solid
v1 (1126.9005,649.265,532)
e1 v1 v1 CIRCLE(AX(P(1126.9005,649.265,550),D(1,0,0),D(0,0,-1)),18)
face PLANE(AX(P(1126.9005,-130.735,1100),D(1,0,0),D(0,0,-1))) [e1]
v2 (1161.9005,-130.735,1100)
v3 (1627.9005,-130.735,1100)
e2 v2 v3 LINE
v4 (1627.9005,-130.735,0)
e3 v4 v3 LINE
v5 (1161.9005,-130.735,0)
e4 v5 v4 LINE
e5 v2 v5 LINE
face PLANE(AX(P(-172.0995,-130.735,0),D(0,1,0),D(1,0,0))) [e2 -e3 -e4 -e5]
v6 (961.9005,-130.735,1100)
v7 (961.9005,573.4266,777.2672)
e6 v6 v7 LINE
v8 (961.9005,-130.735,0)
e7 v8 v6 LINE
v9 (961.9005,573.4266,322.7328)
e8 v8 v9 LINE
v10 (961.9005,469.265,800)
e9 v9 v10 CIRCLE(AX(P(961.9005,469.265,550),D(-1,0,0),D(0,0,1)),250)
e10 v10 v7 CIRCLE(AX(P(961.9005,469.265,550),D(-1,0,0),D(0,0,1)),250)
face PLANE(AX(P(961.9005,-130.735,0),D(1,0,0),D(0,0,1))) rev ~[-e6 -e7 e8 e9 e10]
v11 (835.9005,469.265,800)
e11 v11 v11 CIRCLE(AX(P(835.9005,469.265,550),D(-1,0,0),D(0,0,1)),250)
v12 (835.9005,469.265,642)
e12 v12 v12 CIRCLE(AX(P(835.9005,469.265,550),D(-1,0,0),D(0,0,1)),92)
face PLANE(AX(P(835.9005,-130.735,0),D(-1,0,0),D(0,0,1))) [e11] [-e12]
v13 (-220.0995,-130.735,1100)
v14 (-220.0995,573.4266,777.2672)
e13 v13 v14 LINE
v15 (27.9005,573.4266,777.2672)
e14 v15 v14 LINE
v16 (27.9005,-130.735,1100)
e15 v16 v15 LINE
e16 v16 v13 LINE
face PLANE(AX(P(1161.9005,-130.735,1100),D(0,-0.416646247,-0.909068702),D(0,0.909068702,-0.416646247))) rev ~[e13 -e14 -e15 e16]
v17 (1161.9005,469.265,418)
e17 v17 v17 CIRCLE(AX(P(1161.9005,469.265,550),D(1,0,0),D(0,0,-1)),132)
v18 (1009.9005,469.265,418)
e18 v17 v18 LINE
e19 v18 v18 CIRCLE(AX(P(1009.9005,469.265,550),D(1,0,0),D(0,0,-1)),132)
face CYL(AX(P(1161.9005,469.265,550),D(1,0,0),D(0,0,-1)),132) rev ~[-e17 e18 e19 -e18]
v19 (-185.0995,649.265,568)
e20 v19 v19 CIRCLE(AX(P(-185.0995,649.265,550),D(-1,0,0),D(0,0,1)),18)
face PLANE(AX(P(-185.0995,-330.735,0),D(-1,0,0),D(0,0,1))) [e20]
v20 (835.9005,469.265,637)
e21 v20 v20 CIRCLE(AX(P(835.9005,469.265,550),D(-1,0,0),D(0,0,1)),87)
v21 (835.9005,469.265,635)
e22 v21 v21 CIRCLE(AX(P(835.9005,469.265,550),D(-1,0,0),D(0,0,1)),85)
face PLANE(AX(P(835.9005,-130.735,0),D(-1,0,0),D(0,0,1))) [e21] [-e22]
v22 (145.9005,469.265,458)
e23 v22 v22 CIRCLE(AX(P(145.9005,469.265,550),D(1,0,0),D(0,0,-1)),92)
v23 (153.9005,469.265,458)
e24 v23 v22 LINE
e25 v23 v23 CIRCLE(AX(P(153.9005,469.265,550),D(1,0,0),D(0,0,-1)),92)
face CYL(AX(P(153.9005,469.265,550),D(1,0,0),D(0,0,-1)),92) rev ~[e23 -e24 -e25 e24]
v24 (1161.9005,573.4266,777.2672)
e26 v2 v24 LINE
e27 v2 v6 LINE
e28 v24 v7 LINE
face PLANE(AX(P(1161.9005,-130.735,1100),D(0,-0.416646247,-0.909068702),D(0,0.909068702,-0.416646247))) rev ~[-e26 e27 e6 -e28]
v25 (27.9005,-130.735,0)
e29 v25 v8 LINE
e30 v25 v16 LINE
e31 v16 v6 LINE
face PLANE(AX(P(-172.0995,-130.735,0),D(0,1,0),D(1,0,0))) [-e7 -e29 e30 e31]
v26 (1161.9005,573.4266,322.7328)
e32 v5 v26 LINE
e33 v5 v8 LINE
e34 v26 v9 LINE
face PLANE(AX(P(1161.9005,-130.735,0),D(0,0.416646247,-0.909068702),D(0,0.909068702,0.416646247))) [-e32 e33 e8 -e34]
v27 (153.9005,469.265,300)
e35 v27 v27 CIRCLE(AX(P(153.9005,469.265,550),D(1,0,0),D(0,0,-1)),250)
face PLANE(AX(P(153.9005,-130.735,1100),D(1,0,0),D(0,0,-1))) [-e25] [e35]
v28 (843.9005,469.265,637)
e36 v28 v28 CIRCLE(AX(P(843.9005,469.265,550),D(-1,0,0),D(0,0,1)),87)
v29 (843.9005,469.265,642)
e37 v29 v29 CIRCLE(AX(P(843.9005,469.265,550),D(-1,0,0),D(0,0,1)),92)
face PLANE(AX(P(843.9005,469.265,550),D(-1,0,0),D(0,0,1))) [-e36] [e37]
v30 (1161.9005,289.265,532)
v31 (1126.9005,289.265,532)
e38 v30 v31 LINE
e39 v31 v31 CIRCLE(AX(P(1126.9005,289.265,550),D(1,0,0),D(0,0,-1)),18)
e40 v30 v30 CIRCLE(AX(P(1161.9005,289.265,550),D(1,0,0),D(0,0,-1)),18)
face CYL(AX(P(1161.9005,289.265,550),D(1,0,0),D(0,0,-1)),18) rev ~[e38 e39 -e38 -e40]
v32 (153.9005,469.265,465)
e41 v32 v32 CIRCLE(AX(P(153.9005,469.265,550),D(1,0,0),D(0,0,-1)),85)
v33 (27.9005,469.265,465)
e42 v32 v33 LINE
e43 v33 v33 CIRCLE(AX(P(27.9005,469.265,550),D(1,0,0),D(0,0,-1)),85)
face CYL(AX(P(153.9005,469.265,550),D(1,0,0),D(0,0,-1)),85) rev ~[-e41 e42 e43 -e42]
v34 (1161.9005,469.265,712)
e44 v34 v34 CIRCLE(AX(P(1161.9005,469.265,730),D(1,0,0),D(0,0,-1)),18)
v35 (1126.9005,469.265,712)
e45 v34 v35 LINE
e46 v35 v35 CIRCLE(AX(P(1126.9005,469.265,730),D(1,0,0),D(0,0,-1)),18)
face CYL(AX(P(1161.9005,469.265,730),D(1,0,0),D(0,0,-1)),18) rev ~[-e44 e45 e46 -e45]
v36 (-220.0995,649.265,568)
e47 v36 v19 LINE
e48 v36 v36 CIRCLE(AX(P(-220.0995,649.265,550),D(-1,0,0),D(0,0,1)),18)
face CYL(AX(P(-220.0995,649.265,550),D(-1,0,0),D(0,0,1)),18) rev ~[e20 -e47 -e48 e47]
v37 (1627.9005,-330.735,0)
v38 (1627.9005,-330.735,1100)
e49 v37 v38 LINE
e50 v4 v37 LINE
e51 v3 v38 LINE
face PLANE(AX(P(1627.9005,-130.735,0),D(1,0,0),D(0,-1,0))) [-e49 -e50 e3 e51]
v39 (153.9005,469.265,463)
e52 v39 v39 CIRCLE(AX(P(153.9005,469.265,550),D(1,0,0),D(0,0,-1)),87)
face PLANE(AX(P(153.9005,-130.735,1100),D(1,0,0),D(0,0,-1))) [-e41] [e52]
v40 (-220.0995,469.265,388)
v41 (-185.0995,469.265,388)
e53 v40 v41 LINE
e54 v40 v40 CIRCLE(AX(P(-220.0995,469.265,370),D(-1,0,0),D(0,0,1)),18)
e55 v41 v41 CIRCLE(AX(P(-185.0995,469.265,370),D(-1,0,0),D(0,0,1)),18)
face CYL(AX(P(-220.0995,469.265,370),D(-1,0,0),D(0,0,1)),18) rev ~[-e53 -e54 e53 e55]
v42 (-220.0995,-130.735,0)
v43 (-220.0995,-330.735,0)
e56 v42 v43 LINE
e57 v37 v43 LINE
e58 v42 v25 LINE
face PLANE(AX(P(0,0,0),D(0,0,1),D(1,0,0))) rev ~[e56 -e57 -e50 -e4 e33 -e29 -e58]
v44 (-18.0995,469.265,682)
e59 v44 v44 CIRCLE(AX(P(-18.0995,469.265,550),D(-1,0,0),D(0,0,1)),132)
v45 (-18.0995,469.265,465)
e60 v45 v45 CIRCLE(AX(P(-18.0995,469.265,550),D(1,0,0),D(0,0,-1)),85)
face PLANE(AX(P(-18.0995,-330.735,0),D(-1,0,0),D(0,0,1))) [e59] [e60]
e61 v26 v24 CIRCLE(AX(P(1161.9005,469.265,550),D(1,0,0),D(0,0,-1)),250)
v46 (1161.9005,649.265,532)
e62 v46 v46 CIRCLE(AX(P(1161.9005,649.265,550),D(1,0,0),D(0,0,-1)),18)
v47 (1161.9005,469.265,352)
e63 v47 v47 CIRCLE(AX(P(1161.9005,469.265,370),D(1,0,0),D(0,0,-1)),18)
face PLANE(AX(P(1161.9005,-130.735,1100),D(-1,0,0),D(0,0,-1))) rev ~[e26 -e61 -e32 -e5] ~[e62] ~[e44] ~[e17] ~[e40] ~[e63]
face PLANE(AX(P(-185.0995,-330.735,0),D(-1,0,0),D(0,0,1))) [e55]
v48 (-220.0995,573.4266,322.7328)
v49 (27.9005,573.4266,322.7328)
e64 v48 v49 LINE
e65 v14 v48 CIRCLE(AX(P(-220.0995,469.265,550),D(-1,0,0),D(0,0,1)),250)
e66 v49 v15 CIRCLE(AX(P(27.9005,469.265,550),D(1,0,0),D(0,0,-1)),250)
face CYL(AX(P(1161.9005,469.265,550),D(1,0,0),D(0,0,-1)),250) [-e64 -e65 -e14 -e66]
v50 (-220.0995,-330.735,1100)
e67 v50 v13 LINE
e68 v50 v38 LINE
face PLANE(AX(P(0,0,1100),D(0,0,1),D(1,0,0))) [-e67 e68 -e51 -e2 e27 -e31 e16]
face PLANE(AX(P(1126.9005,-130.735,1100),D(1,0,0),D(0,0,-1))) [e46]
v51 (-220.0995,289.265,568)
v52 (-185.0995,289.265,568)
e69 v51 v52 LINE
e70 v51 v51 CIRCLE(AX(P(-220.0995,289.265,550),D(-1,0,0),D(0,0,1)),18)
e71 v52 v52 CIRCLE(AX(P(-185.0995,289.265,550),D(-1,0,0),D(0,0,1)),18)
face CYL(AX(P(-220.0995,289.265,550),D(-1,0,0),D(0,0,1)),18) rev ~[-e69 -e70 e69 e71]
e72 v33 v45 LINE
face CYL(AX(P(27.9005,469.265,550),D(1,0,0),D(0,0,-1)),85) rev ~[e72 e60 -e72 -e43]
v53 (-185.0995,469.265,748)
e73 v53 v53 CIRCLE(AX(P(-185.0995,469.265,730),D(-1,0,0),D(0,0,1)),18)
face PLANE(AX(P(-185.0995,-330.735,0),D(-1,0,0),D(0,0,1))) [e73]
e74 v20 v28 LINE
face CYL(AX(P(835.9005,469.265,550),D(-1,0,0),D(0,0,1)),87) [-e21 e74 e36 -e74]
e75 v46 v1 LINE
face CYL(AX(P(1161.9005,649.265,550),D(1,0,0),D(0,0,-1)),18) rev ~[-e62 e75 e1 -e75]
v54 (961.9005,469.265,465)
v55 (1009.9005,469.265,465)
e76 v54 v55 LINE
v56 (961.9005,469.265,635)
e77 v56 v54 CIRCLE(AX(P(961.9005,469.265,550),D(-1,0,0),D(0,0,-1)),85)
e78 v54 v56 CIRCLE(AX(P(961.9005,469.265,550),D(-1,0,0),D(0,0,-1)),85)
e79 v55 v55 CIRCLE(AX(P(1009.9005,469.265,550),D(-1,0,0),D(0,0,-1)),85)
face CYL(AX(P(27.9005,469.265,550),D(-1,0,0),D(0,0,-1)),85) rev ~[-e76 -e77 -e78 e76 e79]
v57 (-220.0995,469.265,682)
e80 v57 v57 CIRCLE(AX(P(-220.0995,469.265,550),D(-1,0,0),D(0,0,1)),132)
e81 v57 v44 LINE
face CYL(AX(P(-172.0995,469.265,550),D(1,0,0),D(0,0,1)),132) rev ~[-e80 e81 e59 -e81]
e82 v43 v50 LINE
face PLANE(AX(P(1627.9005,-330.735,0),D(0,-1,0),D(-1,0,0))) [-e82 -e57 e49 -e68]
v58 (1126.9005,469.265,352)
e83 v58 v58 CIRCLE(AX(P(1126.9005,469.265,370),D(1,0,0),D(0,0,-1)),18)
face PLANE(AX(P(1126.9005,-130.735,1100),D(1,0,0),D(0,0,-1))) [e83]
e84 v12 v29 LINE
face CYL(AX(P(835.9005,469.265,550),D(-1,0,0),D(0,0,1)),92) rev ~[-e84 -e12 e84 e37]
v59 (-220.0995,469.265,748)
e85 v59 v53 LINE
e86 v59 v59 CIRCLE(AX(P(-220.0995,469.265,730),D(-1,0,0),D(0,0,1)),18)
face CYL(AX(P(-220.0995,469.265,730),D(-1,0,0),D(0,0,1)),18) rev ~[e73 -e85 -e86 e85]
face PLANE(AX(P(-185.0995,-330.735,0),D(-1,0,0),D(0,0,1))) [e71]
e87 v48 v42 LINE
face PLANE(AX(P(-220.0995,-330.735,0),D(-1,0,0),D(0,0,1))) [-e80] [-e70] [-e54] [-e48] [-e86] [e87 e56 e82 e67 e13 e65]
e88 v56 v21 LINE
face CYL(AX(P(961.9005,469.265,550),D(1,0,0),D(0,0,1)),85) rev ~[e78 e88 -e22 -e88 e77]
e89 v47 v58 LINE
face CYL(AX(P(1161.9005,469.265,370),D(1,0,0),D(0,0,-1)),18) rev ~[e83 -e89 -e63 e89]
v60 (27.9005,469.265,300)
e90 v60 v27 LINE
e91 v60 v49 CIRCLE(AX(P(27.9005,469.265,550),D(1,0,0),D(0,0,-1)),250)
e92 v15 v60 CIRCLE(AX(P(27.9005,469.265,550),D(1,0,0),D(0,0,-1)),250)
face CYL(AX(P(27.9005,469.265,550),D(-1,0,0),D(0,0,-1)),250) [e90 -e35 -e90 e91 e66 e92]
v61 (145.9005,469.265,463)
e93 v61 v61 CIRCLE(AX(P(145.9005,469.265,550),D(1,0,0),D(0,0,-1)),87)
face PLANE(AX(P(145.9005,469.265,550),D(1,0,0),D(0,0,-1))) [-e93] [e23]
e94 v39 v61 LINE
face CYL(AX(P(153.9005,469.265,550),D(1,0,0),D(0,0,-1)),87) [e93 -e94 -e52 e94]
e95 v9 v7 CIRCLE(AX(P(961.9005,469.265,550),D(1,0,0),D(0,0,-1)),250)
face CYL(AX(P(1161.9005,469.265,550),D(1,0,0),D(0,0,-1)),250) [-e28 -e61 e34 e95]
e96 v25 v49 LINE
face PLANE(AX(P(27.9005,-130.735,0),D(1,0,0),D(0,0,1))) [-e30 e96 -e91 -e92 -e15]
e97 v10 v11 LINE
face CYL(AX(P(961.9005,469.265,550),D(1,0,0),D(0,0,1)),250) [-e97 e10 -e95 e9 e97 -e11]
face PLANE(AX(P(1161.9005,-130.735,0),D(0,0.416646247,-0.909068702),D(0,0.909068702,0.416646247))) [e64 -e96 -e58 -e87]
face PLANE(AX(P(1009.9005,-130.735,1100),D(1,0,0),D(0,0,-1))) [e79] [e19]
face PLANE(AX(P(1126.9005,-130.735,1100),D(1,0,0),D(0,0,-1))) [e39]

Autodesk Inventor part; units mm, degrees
ref_plane "YZ Plane" through (0, 0, 0) normal (1, 0, 0) x (0, 1, 0)
ref_plane "XZ Plane" through (0, 0, 0) normal (0, 1, 0) x (-1, 0, 0)
ref_plane "XY Plane" through (0, 0, 0) normal (0, 0, 1) x (1, 0, 0)
sketch "Szkic1" plane through (0, 0, 0) normal (0, 0, 1) x (1, 0, 0)
  line L0 (-172.0995, -130.735) -> (1627.9005, -130.735)
  line L1 (1627.9005, -130.735) -> (1627.9005, -330.735)
  line L2 (1627.9005, -330.735) -> (-172.0995, -330.735)
  line L3 (-172.0995, -330.735) -> (-172.0995, -130.735)
  dimension "d6" = 1800
  dimension "d7" = 200
extrude "Wyciągnięcie proste1" add sketch "Szkic1" along normal blind 1100
sketch "Szkic2" plane through (-172.0995, -130.735, 0) normal (0, 1, 0) x (1, 0, 0)
  point P0 (172.0995, 0)
sketch "Szkic3" plane through (-172.0995, -130.735, 0) normal (0, 1, 0) x (1, 0, 0)
  line L0 (0, 0) -> (1800, 0) projected
  line L1 (0, -1100) -> (1800, -1100) projected
  line L2 (0, 0) -> (200, 0)
  line L3 (200, 0) -> (200, -1100)
  line L4 (200, -1100) -> (0, -1100)
  line L5 (0, -1100) -> (0, 0)
  line L6 (1800, 0) -> (1700, 0)
  line L7 (1700, -1100) -> (1800, -1100)
  line L8 (1334, 0) -> (1134, 0)
  line L9 (1134, 0) -> (1134, -1100)
  line L10 (1134, -1100) -> (1334, -1100)
  line L11 (1334, -1100) -> (1334, 0)
  line L12 (100, 0) -> (100, -1100)
  line L13 (1234, 0) -> (1234, -1100) construction
  point P0 (172.0995, 0)
  point P1 (1134, 0)
  dimension "d10" = 200
  dimension "d15" = 200
  dimension "d21" = 934
extrude "Wyciągnięcie proste2" add sketch "Szkic3" along normal blind 1200 contours L0 L12 L1 L5 | L0 L3 L1 L12 | L0 L11 L1 L9
sketch "Szkic6" plane through (27.9005, -130.735, 1100) normal (1, 0, 0) x (0, 0, -1)
  line L0 (0, 1200) -> (1100, 1200) projected
  line L1 (550, 1200) -> (550, 0)
  line L2 (1100, 0) -> (0, 0) projected
  line L3 (0, 0) -> (0, 1200) projected
  line L4 (0, 600) -> (1100, 600)
  line L5 (1100, 0) -> (1100, 1200) projected
  circle A0 centre (550, 600) radius 85
  point P0 (1100, 130.735)
  dimension "d23" = 170
extrude "Wyciągnięcie proste4" cut sketch "Szkic6" along normal blind 982 and the other way blind 46 contours A0 L4 L1 | L1 L4 A0 | L4 L1 A0 | L4 A0 L1
sketch "Szkic7" plane through (1161.9005, -130.735, 1100) normal (1, 0, 0) x (0, 0, -1)
  point P0 (1100, 130.735)
sketch "Szkic8" plane through (1161.9005, -130.735, 1100) normal (1, 0, 0) x (0, 0, -1)
  circle A0 centre (550, 600) radius 85 projected
  circle A1 centre (550, 600) radius 132
  point P0 (1100, 130.735)
  dimension "d28" = 264
extrude "Wyciągnięcie proste5" cut sketch "Szkic8" against normal up to surface (152 mm away) contours A0 | A1
sketch "Szkic9" plane through (-172.0995, -330.735, 0) normal (-1, 0, 0) x (0, 0, 1)
  circle A0 centre (550, 800) radius 85 projected
  circle A1 centre (550, 800) radius 132
  point P0 (0, 330.735)
extrude "Wyciągnięcie proste6" cut sketch "Szkic9" against normal up to surface (154 mm away) contours A0 | A1
sketch "Szkic10" plane through (1161.9005, -130.735, 1100) normal (1, 0, 0) x (0, 0, -1)
  line L0 (1100, 1200) -> (0, 1200) projected
  line L1 (1100, 0) -> (0, 0) projected
  line L2 (0, -200) -> (0, 1200) projected
  circle A0 centre (550, 600) radius 250
  line L3 (0, 0) -> (322.7328, 704.1616)
  line L4 (1100, 0) -> (777.2672, 704.1616)
  line L5 (0, 0) -> (0, 1200)
  line L6 (0, 1200) -> (1100, 1200)
  line L7 (1100, -200) -> (1100, 1200) projected
  line L8 (1100, 1200) -> (1100, 0)
  point P0 (1100, 130.735)
  dimension "d33" = 500
extrude "Wyciągnięcie proste7" cut sketch "Szkic10" against normal through all contours L7 L4 A0 L3 L2 L0
sketch "Szkic11" plane through (-172.0995, -330.735, 0) normal (-1, 0, 0) x (0, 0, 1)
  circle A0 centre (550, 800) radius 132
  circle A1 centre (550, 800) radius 85 projected
  circle A2 centre (550, 800) radius 250
  line L0 (0, 200) -> (1100, 200) projected
  line L1 (0, 0) -> (1100, 0)
  line L2 (1100, 0) -> (1100, 200)
  line L3 (1100, 200) -> (0, 200)
  line L4 (0, 200) -> (0, 0)
  line L5 (1100, 200) -> (777.2672, 904.1616) projected
  line L6 (1100, 200) -> (777.2672, 904.1616)
  line L7 (322.7328, 904.1616) -> (0, 200) projected
  line L8 (0, 200) -> (322.7328, 904.1616)
  point P0 (0, 330.735)
extrude "Wyciągnięcie proste8" add sketch "Szkic11" along normal blind 48 contours A2 | A2 L5 L0 L7 | L2 L1 L4 L0
sketch "Szkic12" plane through (-220.0995, -330.735, 0) normal (-1, 0, 0) x (0, 0, 1)
  point P0 (0, 330.735)
sketch "Szkic13" plane through (-18.0995, 469.265, 550) normal (-1, 0, 0) x (0, 0, 1)
  point P0 (-550, -469.265)
ref_plane "Płaszczyzna konstrukcyjna1" through (-220.0995, -330.735, 0) normal (-1, 0, 0) x (0, 0, 1)
sketch "Szkic14" plane through (-220.0995, -330.735, 0) normal (-1, 0, 0) x (0, 0, 1)
  point P0 (0, 330.735)
sketch "Szkic15" plane through (-220.0995, -330.735, 0) normal (-1, 0, 0) x (0, 0, 1)
  point P0 (0, 330.735)
sketch "Szkic16" plane through (-220.0995, -330.735, 0) normal (-1, 0, 0) x (0, 0, 1)
  circle A0 centre (550, 980) radius 18
  point P0 (0, 330.735)
  dimension "d39" = 36
extrude "Wyciągnięcie proste9" cut sketch "Szkic16" against normal blind 35
sketch "Szkic18" plane through (-220.0995, -330.735, 0) normal (-1, 0, 0) x (0, 0, 1)
  circle A0 centre (550, 620) radius 18
  circle A1 centre (370, 800) radius 18
  point P0 (0, 330.735)
  dimension "d43" = 36
  dimension "d44" = 36
extrude "Wyciągnięcie proste10" cut sketch "Szkic18" against normal blind 35
thread "Gwint1" size "M36x4" class "6H" standard "ANSI Metric M Profile" full length
thread "Gwint2" size "M36x4" class "6H" standard "ANSI Metric M Profile" full length
thread "Gwint3" size "M36x4" class "6H" standard "ANSI Metric M Profile" full length
sketch "Szkic19" plane through (-220.0995, -330.735, 0) normal (-1, 0, 0) x (0, 0, 1)
  circle A0 centre (730, 800) radius 18
  point P0 (0, 330.735)
  dimension "d57" = 36
extrude "Wyciągnięcie proste12" cut sketch "Szkic19" against normal blind 35
thread "Gwint5" size "M36x4" class "6H" standard "ANSI Metric M Profile" full length
sketch "Szkic20" plane through (27.9005, -130.735, 1100) normal (1, 0, 0) x (0, 0, -1)
  point P0 (1100, 130.735)
sketch "Szkic26" plane through (961.9005, -130.735, 0) normal (-1, 0, 0) x (0, 0, 1)
  circle A0 centre (550, 600) radius 85 projected
  circle A1 centre (550, 600) radius 250
  point P0 (0, 130.735)
extrude "Wyciągnięcie proste15" add sketch "Szkic26" along normal blind 126
sketch "Szkic27" plane through (835.9005, 469.265, 550) normal (-1, 0, 0) x (0, 0, 1)
  circle A0 centre (0, 0) radius 87
  circle A1 centre (0, 0) radius 92
  point P0 (-550, -469.265)
  dimension "d71" = 174
  dimension "d72" = 184
extrude "Wyciągnięcie proste16" cut sketch "Szkic27" against normal blind 8
sketch "Szkic28" plane through (-220.0995, -330.735, 0) normal (-1, 0, 0) x (0, 0, 1)
  point P0 (0, 330.735)
sketch "Szkic29" plane through (1161.9005, -130.735, 1100) normal (1, 0, 0) x (0, 0, -1)
  circle A0 centre (550, 780) radius 18 projected
  circle A1 centre (550, 780) radius 18
  circle A2 centre (730, 600) radius 18 projected
  circle A3 centre (730, 600) radius 18
  circle A4 centre (550, 420) radius 18 projected
  circle A5 centre (550, 420) radius 18
  circle A6 centre (370, 600) radius 18 projected
  circle A7 centre (370, 600) radius 18
  point P0 (1100, 130.735)
  dimension "d75" = 36
  dimension "d76" = 36
  dimension "d77" = 36
  dimension "d78" = 36
extrude "Wyciągnięcie proste17" cut sketch "Szkic29" against normal blind 35
thread "Gwint6" size "M36x4" class "6H" standard "ANSI Metric M Profile" full length
thread "Gwint7" size "M36x4" class "6H" standard "ANSI Metric M Profile" full length
thread "Gwint8" size "M36x4" class "6H" standard "ANSI Metric M Profile" full length
thread "Gwint9" size "M36x4" class "6H" standard "ANSI Metric M Profile" full length
sketch "Szkic30" plane through (27.9005, -130.735, 1100) normal (1, 0, 0) x (0, 0, -1)
  circle A0 centre (550, 600) radius 250
  point P0 (1100, 130.735)
  dimension "d89" = 500
extrude "Wyciągnięcie proste18" add sketch "Szkic30" along normal blind 126
sketch "Szkic31" plane through (153.9005, 469.265, 550) normal (1, 0, 0) x (0, 0, -1)
  point P0 (550, -469.265)
sketch "Szkic32" plane through (153.9005, 469.265, 550) normal (1, 0, 0) x (0, 0, -1)
  circle A0 centre (0, 0) radius 85 projected
  circle A1 centre (0, 0) radius 85
  point P0 (550, -469.265)
  dimension "d92" = 170
extrude "Wyciągnięcie proste19" cut sketch "Szkic32" against normal blind 400
sketch "Szkic33" plane through (153.9005, 469.265, 550) normal (1, 0, 0) x (0, 0, -1)
  circle A0 centre (0, 0) radius 87
  circle A1 centre (0, 0) radius 92
  point P0 (550, -469.265)
  dimension "d95" = 174
  dimension "d96" = 184
extrude "Wyciągnięcie proste20" cut sketch "Szkic33" against normal blind 8
properties part number "podstawa"
